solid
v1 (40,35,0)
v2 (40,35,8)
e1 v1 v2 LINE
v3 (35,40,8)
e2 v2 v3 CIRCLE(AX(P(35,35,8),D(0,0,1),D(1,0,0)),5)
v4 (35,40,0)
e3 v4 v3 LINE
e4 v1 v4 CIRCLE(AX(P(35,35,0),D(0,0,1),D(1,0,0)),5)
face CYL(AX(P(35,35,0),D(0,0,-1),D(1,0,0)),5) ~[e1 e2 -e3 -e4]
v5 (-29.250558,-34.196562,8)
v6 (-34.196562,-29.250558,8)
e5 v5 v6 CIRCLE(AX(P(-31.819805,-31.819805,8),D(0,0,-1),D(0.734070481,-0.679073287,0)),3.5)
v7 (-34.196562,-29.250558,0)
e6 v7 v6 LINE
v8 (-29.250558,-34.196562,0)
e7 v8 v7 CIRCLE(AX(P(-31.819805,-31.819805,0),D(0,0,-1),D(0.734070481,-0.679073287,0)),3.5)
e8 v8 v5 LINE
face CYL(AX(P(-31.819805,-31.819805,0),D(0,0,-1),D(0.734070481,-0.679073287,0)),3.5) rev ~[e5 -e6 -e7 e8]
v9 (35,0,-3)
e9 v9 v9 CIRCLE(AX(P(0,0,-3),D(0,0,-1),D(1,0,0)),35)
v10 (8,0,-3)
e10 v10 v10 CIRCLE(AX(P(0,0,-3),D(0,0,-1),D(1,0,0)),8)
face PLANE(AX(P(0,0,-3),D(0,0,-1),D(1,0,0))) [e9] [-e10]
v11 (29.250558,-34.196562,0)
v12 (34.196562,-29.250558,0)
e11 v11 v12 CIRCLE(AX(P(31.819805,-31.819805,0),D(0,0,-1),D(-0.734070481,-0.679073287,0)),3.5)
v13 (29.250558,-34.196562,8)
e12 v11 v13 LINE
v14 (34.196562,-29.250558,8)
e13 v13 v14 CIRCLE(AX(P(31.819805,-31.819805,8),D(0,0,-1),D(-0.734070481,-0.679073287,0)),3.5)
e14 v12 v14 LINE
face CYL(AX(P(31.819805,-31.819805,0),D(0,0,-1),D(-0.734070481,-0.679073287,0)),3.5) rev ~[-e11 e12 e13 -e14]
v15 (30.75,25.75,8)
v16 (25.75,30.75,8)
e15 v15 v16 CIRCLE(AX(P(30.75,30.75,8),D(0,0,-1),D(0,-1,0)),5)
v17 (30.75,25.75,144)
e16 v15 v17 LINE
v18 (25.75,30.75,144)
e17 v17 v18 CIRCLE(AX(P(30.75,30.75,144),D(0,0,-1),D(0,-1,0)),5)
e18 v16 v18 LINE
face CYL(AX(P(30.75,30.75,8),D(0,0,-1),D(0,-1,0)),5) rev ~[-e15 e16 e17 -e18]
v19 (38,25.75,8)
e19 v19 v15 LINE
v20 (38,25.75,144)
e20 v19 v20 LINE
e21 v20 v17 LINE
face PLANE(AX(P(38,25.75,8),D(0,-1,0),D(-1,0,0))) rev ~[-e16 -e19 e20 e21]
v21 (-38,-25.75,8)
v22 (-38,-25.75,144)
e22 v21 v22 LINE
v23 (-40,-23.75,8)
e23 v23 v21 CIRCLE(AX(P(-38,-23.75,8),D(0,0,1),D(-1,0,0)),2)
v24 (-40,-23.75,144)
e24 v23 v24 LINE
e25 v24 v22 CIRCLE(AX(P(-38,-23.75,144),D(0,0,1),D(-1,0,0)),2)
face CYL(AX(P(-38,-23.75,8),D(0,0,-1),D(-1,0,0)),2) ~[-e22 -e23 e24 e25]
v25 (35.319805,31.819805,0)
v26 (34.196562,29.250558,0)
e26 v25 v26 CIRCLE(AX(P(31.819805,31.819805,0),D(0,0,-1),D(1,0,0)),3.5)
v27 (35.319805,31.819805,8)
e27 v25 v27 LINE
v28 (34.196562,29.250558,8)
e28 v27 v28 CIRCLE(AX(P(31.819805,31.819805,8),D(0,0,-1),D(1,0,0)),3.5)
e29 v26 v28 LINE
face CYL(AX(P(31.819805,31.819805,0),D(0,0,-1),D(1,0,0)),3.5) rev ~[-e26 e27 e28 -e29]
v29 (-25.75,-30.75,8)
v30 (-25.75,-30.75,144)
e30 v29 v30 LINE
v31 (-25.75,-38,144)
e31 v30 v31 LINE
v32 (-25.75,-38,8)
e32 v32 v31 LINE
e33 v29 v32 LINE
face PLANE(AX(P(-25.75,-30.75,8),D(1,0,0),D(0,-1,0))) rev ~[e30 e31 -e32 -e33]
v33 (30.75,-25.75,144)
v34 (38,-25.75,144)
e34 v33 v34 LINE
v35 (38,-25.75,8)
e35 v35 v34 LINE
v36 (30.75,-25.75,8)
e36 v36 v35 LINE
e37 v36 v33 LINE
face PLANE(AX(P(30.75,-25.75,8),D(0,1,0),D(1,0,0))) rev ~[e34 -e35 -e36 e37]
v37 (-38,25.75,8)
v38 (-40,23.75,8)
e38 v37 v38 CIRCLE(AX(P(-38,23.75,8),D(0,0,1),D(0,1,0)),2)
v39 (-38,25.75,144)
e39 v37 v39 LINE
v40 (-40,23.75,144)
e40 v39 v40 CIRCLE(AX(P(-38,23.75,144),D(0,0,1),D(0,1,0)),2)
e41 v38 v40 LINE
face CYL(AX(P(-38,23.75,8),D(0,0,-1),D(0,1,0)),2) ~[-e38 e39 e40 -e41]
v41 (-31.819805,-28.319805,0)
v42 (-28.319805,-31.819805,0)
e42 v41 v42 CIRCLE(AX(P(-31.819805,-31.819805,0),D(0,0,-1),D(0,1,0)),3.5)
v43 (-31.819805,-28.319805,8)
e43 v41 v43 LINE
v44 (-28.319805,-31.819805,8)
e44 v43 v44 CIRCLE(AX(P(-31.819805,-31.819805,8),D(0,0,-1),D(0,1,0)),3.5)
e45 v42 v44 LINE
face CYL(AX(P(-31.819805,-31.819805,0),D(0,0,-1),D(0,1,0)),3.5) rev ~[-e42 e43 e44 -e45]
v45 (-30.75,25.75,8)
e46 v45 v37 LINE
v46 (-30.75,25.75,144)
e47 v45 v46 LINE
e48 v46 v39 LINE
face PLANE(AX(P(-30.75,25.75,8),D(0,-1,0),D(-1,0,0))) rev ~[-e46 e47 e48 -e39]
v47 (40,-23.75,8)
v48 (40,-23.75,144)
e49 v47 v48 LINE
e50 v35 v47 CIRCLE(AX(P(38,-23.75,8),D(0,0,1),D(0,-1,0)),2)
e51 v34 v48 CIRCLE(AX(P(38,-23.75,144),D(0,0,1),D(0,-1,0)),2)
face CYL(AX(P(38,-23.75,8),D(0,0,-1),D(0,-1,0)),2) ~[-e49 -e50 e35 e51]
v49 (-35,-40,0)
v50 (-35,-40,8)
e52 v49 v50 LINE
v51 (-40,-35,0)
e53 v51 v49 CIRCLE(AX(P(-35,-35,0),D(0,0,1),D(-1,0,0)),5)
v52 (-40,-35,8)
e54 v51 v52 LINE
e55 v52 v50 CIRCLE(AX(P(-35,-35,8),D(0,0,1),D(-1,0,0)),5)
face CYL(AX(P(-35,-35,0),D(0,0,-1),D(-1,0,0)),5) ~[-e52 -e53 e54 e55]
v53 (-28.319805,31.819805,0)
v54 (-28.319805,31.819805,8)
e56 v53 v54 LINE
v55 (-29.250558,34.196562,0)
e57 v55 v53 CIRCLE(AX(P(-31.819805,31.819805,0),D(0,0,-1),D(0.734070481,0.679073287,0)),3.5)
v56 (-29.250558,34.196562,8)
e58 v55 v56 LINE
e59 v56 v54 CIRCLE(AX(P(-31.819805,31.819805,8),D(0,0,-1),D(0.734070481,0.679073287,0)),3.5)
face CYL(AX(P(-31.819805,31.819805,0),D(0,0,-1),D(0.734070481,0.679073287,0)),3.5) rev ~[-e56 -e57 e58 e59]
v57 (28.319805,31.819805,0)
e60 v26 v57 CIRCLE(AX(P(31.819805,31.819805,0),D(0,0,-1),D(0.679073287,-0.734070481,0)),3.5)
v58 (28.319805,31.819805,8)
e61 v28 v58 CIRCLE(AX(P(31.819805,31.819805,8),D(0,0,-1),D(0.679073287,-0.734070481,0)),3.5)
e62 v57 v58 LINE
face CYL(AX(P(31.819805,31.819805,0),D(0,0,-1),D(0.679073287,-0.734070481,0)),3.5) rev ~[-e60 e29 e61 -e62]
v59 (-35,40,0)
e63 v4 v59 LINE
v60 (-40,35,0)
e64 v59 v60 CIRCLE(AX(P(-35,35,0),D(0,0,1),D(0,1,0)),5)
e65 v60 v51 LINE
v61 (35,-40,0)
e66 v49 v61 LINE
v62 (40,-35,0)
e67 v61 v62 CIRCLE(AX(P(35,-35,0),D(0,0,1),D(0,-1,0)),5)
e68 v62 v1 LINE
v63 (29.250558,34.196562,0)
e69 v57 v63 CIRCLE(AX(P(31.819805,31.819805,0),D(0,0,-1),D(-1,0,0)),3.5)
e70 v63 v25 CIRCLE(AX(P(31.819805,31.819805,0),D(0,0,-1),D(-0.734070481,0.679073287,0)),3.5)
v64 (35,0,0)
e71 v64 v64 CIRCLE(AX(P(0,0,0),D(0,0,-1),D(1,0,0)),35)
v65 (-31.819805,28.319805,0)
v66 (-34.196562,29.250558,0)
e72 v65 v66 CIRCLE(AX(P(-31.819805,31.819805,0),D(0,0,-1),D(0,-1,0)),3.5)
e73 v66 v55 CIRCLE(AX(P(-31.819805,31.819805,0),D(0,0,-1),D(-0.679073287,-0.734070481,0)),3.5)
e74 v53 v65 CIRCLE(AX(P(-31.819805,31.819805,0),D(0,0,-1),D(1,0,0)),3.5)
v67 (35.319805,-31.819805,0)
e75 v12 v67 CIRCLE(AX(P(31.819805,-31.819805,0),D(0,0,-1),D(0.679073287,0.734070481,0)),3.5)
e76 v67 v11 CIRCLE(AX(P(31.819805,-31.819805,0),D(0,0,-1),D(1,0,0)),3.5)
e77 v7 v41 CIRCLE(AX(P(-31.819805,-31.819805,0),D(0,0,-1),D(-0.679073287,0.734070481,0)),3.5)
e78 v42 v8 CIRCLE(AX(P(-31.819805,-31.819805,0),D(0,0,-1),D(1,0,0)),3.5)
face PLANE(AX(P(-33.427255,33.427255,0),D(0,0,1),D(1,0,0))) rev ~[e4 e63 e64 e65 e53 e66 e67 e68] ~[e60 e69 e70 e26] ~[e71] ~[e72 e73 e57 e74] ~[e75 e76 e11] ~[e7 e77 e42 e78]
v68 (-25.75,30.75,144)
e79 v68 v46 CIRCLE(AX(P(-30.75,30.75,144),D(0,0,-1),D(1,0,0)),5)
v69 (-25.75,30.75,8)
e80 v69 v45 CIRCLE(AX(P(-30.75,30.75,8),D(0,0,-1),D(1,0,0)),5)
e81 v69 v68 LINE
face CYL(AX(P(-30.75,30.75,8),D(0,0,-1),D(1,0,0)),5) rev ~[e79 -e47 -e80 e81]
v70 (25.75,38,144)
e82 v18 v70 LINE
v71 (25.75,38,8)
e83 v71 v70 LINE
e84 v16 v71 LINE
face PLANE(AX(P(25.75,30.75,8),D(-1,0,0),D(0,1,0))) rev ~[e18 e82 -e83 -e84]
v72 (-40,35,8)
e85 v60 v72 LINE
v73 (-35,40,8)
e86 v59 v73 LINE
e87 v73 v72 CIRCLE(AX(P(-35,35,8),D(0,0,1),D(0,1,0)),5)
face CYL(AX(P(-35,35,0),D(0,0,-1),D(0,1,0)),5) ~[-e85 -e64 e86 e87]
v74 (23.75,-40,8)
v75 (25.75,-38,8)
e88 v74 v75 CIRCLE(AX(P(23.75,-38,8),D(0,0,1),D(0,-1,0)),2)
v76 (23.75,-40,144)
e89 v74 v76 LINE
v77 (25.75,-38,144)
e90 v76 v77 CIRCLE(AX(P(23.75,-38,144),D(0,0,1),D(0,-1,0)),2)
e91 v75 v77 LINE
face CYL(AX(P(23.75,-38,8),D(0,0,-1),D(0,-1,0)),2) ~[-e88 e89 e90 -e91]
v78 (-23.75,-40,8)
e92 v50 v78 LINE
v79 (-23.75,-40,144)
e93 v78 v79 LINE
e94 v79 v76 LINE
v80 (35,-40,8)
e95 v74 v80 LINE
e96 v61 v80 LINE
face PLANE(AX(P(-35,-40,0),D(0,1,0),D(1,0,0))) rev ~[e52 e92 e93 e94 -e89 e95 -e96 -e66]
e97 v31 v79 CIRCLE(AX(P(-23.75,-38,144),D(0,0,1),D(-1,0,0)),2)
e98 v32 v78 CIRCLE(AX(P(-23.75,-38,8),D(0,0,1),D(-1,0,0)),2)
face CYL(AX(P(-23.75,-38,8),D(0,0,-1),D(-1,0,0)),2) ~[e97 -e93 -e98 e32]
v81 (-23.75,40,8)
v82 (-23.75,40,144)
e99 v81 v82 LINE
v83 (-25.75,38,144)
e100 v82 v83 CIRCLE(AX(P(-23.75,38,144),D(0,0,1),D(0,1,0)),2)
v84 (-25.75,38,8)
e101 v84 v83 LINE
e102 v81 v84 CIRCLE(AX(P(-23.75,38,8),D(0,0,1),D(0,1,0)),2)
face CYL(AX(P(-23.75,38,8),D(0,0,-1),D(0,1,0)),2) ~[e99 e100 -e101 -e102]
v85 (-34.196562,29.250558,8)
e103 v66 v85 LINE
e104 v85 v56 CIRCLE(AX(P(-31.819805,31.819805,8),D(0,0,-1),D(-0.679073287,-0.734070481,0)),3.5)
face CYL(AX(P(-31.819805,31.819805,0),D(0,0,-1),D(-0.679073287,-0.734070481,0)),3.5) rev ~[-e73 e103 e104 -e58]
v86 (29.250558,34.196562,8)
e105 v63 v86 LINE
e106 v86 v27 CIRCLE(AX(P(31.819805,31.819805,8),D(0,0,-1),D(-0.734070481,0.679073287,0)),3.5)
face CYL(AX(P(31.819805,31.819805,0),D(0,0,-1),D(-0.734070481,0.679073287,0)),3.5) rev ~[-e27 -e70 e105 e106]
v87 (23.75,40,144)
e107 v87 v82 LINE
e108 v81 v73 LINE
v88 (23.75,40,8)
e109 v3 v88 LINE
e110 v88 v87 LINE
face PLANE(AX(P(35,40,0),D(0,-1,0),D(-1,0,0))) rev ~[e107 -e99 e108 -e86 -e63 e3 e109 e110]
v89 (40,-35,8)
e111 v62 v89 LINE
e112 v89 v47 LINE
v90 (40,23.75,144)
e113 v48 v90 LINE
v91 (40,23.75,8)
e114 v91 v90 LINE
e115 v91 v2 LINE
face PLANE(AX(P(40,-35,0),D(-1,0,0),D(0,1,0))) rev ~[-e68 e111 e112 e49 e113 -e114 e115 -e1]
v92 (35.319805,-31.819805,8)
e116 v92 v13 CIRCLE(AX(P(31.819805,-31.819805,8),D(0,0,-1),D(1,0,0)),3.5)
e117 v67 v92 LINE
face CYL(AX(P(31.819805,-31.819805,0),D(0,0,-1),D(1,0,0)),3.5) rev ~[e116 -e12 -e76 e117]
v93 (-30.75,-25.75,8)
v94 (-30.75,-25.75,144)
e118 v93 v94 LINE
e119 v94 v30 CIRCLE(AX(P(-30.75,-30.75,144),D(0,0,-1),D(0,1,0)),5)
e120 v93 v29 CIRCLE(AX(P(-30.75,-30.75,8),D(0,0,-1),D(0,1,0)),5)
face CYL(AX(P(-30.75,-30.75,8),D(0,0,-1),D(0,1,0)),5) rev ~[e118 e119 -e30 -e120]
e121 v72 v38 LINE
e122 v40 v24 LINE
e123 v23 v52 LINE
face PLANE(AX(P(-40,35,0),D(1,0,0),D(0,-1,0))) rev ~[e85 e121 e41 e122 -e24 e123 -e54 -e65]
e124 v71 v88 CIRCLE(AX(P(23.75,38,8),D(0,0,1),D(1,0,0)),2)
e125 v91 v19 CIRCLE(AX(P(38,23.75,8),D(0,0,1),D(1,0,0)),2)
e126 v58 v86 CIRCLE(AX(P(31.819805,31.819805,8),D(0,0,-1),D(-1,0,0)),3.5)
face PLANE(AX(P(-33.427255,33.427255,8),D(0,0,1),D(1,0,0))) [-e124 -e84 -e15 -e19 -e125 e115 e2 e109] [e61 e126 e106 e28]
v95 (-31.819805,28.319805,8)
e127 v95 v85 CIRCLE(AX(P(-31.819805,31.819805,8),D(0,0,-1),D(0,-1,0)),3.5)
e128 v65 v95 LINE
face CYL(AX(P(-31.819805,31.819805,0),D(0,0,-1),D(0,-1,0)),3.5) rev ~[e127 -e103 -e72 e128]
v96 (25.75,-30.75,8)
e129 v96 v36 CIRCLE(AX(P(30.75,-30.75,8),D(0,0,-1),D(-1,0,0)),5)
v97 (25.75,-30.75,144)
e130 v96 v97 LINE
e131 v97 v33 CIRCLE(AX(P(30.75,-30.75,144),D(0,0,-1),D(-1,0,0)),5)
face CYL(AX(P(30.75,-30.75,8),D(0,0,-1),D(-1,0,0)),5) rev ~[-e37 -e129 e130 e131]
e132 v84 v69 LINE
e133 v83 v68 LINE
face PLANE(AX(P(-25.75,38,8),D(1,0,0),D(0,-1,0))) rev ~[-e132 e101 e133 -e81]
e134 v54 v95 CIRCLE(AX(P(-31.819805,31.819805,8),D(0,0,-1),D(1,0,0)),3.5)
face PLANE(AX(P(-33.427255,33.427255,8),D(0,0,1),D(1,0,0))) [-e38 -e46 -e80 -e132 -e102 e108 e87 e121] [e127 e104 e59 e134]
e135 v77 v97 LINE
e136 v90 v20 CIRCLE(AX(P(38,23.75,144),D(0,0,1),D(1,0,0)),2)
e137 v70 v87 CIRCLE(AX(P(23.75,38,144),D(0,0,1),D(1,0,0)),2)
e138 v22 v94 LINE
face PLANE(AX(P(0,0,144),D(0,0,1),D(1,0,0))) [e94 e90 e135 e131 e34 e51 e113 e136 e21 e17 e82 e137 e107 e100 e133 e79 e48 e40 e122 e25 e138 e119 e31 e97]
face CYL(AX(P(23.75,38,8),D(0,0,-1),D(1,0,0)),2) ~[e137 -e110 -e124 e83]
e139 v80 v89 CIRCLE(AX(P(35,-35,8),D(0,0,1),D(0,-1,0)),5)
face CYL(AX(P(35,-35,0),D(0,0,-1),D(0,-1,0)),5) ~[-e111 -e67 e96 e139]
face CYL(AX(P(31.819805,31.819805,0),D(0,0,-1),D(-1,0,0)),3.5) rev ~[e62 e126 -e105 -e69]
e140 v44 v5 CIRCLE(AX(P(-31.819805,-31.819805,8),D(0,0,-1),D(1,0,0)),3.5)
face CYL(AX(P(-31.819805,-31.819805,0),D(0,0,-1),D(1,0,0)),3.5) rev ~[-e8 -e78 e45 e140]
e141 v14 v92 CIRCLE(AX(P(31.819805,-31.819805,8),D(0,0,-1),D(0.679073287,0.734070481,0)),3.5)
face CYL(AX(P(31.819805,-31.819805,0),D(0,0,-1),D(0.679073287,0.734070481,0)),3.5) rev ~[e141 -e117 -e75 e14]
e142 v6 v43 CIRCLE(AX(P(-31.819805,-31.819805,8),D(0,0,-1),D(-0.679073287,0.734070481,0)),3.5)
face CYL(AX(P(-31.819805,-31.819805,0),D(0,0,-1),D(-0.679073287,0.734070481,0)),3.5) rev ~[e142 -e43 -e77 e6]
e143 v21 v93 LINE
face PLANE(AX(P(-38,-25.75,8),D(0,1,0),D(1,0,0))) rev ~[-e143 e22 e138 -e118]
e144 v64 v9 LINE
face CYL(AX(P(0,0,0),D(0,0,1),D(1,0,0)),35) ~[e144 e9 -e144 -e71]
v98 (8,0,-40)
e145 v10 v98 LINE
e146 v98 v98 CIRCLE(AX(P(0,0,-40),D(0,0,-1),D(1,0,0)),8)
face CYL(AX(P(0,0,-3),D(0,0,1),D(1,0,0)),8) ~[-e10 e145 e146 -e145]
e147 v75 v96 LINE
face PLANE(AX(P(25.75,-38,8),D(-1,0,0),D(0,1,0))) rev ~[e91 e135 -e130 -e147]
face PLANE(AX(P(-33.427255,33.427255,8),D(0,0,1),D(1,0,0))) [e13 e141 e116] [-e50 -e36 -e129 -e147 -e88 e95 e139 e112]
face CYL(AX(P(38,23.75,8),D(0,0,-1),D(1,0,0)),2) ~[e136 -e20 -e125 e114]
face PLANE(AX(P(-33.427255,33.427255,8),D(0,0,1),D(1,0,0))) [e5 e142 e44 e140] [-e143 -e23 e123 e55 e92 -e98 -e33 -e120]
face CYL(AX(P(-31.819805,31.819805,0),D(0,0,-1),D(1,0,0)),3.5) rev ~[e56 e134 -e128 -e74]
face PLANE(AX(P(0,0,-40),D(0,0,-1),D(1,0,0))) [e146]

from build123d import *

# Parameters (mm, degrees)
F1_DEPTH = 8
F2_R     = 35
F3_DEPTH = 3
F4_R     = 8
F5_DEPTH = 37
F7_DEPTH = 136


# Not quite as in the source:
# - a feature names something its author has since deleted; it is built from what else it names


with BuildPart() as f1:
    # F0 (on Top) → F1 (new body)
    with BuildSketch(Plane.XY):
        with BuildLine():
            Line((-20.6155281281, 40), (-35, 40))
            ThreePointArc((-35, 40), (-38.5355339059, 38.5355339059), (-40, 35))
            Line((-40, 35), (-40, 20.6155281281))
            ThreePointArc((-40, 20.6155281281), (-37.348673038, 25.1013271024), (-34.1965616575, 29.25055847))
            ThreePointArc((-34.1965616575, 29.25055847), (-34.2946788875, 34.2946788875), (-29.25055847, 34.1965616575))
            ThreePointArc((-29.25055847, 34.1965616575), (-25.1013271024, 37.348673038), (-20.6155281281, 40))
        make_face()
        with BuildLine():
            ThreePointArc((-34.1965616575, 29.25055847), (-37.348673038, 25.1013271024), (-40, 20.6155281281))
            Line((-40, 20.6155281281), (-40, -20.6155281281))
            ThreePointArc((-40, -20.6155281281), (-37.348673038, -25.1013271024), (-34.1965616575, -29.25055847))
            ThreePointArc((-34.1965616575, -29.25055847), (-33.0960568151, -28.5607897045), (-31.8198051534, -28.3198051534))
            Line((-31.8198051534, -28.3198051534), (-31.8198051534, 28.3198051534))
            ThreePointArc((-31.8198051534, 28.3198051534), (-33.0960568151, 28.5607897045), (-34.1965616575, 29.25055847))
        make_face()
        with BuildLine():
            Line((28.3198051534, 31.8198051534), (-28.3198051534, 31.8198051534))
            ThreePointArc((-28.3198051534, 31.8198051534), (-29.3449314192, 29.3449314192), (-31.8198051534, 28.3198051534))
            Line((-31.8198051534, 28.3198051534), (-31.8198051534, -28.3198051534))
            ThreePointArc((-31.8198051534, -28.3198051534), (-29.3449314192, -29.3449314192), (-28.3198051534, -31.8198051534))
            ThreePointArc((-28.3198051534, -31.8198051534), (-28.5607897045, -33.0960568151), (-29.25055847, -34.1965616575))
            ThreePointArc((-29.25055847, -34.1965616575), (-25.1013271024, -37.348673038), (-20.6155281281, -40))
            Line((-20.6155281281, -40), (20.6155281281, -40))
            ThreePointArc((20.6155281281, -40), (25.1013271024, -37.348673038), (29.25055847, -34.1965616575))
            ThreePointArc((29.25055847, -34.1965616575), (29.3449314192, -29.3449314192), (34.1965616575, -29.25055847))
            ThreePointArc((34.1965616575, -29.25055847), (37.348673038, -25.1013271024), (40, -20.6155281281))
            Line((40, -20.6155281281), (40, 20.6155281281))
            ThreePointArc((40, 20.6155281281), (37.348673038, 25.1013271024), (34.1965616575, 29.25055847))
            ThreePointArc((34.1965616575, 29.25055847), (30.417779434, 28.612887025), (28.3198051534, 31.8198051534))
        make_face()
        with BuildLine():
            Line((20.6155281281, 40), (-20.6155281281, 40))
            ThreePointArc((-20.6155281281, 40), (-25.1013271024, 37.348673038), (-29.25055847, 34.1965616575))
            ThreePointArc((-29.25055847, 34.1965616575), (-28.5607897045, 33.0960568151), (-28.3198051534, 31.8198051534))
            Line((-28.3198051534, 31.8198051534), (28.3198051534, 31.8198051534))
            ThreePointArc((28.3198051534, 31.8198051534), (28.5607897045, 33.0960568151), (29.25055847, 34.1965616575))
            ThreePointArc((29.25055847, 34.1965616575), (25.1013271024, 37.348673038), (20.6155281281, 40))
        make_face()
        with BuildLine():
            Line((35, 40), (20.6155281281, 40))
            ThreePointArc((20.6155281281, 40), (25.1013271024, 37.348673038), (29.25055847, 34.1965616575))
            ThreePointArc((29.25055847, 34.1965616575), (33.0960568151, 35.0788206023), (35.3198051534, 31.8198051534))
            ThreePointArc((35.3198051534, 31.8198051534), (35.0267232818, 30.417779434), (34.1965616575, 29.25055847))
            ThreePointArc((34.1965616575, 29.25055847), (37.348673038, 25.1013271024), (40, 20.6155281281))
            Line((40, 20.6155281281), (40, 35))
            ThreePointArc((40, 35), (38.5355339059, 38.5355339059), (35, 40))
        make_face()
        with BuildLine():
            ThreePointArc((-34.1965616575, -29.25055847), (-37.348673038, -25.1013271024), (-40, -20.6155281281))
            Line((-40, -20.6155281281), (-40, -35))
            ThreePointArc((-40, -35), (-38.5355339059, -38.5355339059), (-35, -40))
            Line((-35, -40), (-20.6155281281, -40))
            ThreePointArc((-20.6155281281, -40), (-25.1013271024, -37.348673038), (-29.25055847, -34.1965616575))
            ThreePointArc((-29.25055847, -34.1965616575), (-34.2946788875, -34.2946788875), (-34.1965616575, -29.25055847))
        make_face()
        with BuildLine():
            Line((40, -35), (40, -20.6155281281))
            ThreePointArc((40, -20.6155281281), (37.348673038, -25.1013271024), (34.1965616575, -29.25055847))
            ThreePointArc((34.1965616575, -29.25055847), (35.0267232818, -30.417779434), (35.3198051534, -31.8198051534))
            ThreePointArc((35.3198051534, -31.8198051534), (33.0960568151, -35.0788206023), (29.25055847, -34.1965616575))
            ThreePointArc((29.25055847, -34.1965616575), (25.1013271024, -37.348673038), (20.6155281281, -40))
            Line((20.6155281281, -40), (35, -40))
            ThreePointArc((35, -40), (38.5355339059, -38.5355339059), (40, -35))
        make_face()
    extrude(amount=F1_DEPTH)

    # F2 (on face) → F3 (join)
    with BuildSketch(Plane(origin=(0, 0, 0), x_dir=(1, 0, 0), z_dir=(0, 0, -1))):
        Circle(F2_R)
    extrude(amount=F3_DEPTH)

    # F4 (on face) → F5 (join)
    with BuildSketch(Plane(origin=(0, 0, -3), x_dir=(1, 0, 0), z_dir=(0, 0, -1))):
        Circle(F4_R)
    extrude(amount=F5_DEPTH)

    # F6 (on face) → F7 (join)
    with BuildSketch(Plane.XY.offset(8)):
        with BuildLine():
            Line((-30.75, 25.75), (-38, 25.75))
            ThreePointArc((-38, 25.75), (-39.4142135624, 25.1642135624), (-40, 23.75))
            Line((-40, 23.75), (-40, -23.75))
            ThreePointArc((-40, -23.75), (-39.4142135624, -25.1642135624), (-38, -25.75))
            Line((-38, -25.75), (-30.75, -25.75))
            ThreePointArc((-30.75, -25.75), (-27.2144660941, -27.2144660941), (-25.75, -30.75))
            Line((-25.75, -30.75), (-25.75, -38))
            ThreePointArc((-25.75, -38), (-25.1642135624, -39.4142135624), (-23.75, -40))
            Line((-23.75, -40), (23.75, -40))
            ThreePointArc((23.75, -40), (25.1642135624, -39.4142135624), (25.75, -38))
            Line((25.75, -38), (25.75, -30.75))
            ThreePointArc((25.75, -30.75), (27.2144660941, -27.2144660941), (30.75, -25.75))
            Line((30.75, -25.75), (38, -25.75))
            ThreePointArc((38, -25.75), (39.4142135624, -25.1642135624), (40, -23.75))
            Line((40, -23.75), (40, 23.75))
            ThreePointArc((40, 23.75), (39.4142135624, 25.1642135624), (38, 25.75))
            Line((38, 25.75), (30.75, 25.75))
            ThreePointArc((30.75, 25.75), (27.2144660941, 27.2144660941), (25.75, 30.75))
            Line((25.75, 30.75), (25.75, 38))
            ThreePointArc((25.75, 38), (25.1642135624, 39.4142135624), (23.75, 40))
            Line((23.75, 40), (-23.75, 40))
            ThreePointArc((-23.75, 40), (-25.1642135624, 39.4142135624), (-25.75, 38))
            Line((-25.75, 38), (-25.75, 30.75))
            ThreePointArc((-25.75, 30.75), (-27.2144660941, 27.2144660941), (-30.75, 25.75))
        make_face()
    extrude(amount=F7_DEPTH)


solid = f1.part
